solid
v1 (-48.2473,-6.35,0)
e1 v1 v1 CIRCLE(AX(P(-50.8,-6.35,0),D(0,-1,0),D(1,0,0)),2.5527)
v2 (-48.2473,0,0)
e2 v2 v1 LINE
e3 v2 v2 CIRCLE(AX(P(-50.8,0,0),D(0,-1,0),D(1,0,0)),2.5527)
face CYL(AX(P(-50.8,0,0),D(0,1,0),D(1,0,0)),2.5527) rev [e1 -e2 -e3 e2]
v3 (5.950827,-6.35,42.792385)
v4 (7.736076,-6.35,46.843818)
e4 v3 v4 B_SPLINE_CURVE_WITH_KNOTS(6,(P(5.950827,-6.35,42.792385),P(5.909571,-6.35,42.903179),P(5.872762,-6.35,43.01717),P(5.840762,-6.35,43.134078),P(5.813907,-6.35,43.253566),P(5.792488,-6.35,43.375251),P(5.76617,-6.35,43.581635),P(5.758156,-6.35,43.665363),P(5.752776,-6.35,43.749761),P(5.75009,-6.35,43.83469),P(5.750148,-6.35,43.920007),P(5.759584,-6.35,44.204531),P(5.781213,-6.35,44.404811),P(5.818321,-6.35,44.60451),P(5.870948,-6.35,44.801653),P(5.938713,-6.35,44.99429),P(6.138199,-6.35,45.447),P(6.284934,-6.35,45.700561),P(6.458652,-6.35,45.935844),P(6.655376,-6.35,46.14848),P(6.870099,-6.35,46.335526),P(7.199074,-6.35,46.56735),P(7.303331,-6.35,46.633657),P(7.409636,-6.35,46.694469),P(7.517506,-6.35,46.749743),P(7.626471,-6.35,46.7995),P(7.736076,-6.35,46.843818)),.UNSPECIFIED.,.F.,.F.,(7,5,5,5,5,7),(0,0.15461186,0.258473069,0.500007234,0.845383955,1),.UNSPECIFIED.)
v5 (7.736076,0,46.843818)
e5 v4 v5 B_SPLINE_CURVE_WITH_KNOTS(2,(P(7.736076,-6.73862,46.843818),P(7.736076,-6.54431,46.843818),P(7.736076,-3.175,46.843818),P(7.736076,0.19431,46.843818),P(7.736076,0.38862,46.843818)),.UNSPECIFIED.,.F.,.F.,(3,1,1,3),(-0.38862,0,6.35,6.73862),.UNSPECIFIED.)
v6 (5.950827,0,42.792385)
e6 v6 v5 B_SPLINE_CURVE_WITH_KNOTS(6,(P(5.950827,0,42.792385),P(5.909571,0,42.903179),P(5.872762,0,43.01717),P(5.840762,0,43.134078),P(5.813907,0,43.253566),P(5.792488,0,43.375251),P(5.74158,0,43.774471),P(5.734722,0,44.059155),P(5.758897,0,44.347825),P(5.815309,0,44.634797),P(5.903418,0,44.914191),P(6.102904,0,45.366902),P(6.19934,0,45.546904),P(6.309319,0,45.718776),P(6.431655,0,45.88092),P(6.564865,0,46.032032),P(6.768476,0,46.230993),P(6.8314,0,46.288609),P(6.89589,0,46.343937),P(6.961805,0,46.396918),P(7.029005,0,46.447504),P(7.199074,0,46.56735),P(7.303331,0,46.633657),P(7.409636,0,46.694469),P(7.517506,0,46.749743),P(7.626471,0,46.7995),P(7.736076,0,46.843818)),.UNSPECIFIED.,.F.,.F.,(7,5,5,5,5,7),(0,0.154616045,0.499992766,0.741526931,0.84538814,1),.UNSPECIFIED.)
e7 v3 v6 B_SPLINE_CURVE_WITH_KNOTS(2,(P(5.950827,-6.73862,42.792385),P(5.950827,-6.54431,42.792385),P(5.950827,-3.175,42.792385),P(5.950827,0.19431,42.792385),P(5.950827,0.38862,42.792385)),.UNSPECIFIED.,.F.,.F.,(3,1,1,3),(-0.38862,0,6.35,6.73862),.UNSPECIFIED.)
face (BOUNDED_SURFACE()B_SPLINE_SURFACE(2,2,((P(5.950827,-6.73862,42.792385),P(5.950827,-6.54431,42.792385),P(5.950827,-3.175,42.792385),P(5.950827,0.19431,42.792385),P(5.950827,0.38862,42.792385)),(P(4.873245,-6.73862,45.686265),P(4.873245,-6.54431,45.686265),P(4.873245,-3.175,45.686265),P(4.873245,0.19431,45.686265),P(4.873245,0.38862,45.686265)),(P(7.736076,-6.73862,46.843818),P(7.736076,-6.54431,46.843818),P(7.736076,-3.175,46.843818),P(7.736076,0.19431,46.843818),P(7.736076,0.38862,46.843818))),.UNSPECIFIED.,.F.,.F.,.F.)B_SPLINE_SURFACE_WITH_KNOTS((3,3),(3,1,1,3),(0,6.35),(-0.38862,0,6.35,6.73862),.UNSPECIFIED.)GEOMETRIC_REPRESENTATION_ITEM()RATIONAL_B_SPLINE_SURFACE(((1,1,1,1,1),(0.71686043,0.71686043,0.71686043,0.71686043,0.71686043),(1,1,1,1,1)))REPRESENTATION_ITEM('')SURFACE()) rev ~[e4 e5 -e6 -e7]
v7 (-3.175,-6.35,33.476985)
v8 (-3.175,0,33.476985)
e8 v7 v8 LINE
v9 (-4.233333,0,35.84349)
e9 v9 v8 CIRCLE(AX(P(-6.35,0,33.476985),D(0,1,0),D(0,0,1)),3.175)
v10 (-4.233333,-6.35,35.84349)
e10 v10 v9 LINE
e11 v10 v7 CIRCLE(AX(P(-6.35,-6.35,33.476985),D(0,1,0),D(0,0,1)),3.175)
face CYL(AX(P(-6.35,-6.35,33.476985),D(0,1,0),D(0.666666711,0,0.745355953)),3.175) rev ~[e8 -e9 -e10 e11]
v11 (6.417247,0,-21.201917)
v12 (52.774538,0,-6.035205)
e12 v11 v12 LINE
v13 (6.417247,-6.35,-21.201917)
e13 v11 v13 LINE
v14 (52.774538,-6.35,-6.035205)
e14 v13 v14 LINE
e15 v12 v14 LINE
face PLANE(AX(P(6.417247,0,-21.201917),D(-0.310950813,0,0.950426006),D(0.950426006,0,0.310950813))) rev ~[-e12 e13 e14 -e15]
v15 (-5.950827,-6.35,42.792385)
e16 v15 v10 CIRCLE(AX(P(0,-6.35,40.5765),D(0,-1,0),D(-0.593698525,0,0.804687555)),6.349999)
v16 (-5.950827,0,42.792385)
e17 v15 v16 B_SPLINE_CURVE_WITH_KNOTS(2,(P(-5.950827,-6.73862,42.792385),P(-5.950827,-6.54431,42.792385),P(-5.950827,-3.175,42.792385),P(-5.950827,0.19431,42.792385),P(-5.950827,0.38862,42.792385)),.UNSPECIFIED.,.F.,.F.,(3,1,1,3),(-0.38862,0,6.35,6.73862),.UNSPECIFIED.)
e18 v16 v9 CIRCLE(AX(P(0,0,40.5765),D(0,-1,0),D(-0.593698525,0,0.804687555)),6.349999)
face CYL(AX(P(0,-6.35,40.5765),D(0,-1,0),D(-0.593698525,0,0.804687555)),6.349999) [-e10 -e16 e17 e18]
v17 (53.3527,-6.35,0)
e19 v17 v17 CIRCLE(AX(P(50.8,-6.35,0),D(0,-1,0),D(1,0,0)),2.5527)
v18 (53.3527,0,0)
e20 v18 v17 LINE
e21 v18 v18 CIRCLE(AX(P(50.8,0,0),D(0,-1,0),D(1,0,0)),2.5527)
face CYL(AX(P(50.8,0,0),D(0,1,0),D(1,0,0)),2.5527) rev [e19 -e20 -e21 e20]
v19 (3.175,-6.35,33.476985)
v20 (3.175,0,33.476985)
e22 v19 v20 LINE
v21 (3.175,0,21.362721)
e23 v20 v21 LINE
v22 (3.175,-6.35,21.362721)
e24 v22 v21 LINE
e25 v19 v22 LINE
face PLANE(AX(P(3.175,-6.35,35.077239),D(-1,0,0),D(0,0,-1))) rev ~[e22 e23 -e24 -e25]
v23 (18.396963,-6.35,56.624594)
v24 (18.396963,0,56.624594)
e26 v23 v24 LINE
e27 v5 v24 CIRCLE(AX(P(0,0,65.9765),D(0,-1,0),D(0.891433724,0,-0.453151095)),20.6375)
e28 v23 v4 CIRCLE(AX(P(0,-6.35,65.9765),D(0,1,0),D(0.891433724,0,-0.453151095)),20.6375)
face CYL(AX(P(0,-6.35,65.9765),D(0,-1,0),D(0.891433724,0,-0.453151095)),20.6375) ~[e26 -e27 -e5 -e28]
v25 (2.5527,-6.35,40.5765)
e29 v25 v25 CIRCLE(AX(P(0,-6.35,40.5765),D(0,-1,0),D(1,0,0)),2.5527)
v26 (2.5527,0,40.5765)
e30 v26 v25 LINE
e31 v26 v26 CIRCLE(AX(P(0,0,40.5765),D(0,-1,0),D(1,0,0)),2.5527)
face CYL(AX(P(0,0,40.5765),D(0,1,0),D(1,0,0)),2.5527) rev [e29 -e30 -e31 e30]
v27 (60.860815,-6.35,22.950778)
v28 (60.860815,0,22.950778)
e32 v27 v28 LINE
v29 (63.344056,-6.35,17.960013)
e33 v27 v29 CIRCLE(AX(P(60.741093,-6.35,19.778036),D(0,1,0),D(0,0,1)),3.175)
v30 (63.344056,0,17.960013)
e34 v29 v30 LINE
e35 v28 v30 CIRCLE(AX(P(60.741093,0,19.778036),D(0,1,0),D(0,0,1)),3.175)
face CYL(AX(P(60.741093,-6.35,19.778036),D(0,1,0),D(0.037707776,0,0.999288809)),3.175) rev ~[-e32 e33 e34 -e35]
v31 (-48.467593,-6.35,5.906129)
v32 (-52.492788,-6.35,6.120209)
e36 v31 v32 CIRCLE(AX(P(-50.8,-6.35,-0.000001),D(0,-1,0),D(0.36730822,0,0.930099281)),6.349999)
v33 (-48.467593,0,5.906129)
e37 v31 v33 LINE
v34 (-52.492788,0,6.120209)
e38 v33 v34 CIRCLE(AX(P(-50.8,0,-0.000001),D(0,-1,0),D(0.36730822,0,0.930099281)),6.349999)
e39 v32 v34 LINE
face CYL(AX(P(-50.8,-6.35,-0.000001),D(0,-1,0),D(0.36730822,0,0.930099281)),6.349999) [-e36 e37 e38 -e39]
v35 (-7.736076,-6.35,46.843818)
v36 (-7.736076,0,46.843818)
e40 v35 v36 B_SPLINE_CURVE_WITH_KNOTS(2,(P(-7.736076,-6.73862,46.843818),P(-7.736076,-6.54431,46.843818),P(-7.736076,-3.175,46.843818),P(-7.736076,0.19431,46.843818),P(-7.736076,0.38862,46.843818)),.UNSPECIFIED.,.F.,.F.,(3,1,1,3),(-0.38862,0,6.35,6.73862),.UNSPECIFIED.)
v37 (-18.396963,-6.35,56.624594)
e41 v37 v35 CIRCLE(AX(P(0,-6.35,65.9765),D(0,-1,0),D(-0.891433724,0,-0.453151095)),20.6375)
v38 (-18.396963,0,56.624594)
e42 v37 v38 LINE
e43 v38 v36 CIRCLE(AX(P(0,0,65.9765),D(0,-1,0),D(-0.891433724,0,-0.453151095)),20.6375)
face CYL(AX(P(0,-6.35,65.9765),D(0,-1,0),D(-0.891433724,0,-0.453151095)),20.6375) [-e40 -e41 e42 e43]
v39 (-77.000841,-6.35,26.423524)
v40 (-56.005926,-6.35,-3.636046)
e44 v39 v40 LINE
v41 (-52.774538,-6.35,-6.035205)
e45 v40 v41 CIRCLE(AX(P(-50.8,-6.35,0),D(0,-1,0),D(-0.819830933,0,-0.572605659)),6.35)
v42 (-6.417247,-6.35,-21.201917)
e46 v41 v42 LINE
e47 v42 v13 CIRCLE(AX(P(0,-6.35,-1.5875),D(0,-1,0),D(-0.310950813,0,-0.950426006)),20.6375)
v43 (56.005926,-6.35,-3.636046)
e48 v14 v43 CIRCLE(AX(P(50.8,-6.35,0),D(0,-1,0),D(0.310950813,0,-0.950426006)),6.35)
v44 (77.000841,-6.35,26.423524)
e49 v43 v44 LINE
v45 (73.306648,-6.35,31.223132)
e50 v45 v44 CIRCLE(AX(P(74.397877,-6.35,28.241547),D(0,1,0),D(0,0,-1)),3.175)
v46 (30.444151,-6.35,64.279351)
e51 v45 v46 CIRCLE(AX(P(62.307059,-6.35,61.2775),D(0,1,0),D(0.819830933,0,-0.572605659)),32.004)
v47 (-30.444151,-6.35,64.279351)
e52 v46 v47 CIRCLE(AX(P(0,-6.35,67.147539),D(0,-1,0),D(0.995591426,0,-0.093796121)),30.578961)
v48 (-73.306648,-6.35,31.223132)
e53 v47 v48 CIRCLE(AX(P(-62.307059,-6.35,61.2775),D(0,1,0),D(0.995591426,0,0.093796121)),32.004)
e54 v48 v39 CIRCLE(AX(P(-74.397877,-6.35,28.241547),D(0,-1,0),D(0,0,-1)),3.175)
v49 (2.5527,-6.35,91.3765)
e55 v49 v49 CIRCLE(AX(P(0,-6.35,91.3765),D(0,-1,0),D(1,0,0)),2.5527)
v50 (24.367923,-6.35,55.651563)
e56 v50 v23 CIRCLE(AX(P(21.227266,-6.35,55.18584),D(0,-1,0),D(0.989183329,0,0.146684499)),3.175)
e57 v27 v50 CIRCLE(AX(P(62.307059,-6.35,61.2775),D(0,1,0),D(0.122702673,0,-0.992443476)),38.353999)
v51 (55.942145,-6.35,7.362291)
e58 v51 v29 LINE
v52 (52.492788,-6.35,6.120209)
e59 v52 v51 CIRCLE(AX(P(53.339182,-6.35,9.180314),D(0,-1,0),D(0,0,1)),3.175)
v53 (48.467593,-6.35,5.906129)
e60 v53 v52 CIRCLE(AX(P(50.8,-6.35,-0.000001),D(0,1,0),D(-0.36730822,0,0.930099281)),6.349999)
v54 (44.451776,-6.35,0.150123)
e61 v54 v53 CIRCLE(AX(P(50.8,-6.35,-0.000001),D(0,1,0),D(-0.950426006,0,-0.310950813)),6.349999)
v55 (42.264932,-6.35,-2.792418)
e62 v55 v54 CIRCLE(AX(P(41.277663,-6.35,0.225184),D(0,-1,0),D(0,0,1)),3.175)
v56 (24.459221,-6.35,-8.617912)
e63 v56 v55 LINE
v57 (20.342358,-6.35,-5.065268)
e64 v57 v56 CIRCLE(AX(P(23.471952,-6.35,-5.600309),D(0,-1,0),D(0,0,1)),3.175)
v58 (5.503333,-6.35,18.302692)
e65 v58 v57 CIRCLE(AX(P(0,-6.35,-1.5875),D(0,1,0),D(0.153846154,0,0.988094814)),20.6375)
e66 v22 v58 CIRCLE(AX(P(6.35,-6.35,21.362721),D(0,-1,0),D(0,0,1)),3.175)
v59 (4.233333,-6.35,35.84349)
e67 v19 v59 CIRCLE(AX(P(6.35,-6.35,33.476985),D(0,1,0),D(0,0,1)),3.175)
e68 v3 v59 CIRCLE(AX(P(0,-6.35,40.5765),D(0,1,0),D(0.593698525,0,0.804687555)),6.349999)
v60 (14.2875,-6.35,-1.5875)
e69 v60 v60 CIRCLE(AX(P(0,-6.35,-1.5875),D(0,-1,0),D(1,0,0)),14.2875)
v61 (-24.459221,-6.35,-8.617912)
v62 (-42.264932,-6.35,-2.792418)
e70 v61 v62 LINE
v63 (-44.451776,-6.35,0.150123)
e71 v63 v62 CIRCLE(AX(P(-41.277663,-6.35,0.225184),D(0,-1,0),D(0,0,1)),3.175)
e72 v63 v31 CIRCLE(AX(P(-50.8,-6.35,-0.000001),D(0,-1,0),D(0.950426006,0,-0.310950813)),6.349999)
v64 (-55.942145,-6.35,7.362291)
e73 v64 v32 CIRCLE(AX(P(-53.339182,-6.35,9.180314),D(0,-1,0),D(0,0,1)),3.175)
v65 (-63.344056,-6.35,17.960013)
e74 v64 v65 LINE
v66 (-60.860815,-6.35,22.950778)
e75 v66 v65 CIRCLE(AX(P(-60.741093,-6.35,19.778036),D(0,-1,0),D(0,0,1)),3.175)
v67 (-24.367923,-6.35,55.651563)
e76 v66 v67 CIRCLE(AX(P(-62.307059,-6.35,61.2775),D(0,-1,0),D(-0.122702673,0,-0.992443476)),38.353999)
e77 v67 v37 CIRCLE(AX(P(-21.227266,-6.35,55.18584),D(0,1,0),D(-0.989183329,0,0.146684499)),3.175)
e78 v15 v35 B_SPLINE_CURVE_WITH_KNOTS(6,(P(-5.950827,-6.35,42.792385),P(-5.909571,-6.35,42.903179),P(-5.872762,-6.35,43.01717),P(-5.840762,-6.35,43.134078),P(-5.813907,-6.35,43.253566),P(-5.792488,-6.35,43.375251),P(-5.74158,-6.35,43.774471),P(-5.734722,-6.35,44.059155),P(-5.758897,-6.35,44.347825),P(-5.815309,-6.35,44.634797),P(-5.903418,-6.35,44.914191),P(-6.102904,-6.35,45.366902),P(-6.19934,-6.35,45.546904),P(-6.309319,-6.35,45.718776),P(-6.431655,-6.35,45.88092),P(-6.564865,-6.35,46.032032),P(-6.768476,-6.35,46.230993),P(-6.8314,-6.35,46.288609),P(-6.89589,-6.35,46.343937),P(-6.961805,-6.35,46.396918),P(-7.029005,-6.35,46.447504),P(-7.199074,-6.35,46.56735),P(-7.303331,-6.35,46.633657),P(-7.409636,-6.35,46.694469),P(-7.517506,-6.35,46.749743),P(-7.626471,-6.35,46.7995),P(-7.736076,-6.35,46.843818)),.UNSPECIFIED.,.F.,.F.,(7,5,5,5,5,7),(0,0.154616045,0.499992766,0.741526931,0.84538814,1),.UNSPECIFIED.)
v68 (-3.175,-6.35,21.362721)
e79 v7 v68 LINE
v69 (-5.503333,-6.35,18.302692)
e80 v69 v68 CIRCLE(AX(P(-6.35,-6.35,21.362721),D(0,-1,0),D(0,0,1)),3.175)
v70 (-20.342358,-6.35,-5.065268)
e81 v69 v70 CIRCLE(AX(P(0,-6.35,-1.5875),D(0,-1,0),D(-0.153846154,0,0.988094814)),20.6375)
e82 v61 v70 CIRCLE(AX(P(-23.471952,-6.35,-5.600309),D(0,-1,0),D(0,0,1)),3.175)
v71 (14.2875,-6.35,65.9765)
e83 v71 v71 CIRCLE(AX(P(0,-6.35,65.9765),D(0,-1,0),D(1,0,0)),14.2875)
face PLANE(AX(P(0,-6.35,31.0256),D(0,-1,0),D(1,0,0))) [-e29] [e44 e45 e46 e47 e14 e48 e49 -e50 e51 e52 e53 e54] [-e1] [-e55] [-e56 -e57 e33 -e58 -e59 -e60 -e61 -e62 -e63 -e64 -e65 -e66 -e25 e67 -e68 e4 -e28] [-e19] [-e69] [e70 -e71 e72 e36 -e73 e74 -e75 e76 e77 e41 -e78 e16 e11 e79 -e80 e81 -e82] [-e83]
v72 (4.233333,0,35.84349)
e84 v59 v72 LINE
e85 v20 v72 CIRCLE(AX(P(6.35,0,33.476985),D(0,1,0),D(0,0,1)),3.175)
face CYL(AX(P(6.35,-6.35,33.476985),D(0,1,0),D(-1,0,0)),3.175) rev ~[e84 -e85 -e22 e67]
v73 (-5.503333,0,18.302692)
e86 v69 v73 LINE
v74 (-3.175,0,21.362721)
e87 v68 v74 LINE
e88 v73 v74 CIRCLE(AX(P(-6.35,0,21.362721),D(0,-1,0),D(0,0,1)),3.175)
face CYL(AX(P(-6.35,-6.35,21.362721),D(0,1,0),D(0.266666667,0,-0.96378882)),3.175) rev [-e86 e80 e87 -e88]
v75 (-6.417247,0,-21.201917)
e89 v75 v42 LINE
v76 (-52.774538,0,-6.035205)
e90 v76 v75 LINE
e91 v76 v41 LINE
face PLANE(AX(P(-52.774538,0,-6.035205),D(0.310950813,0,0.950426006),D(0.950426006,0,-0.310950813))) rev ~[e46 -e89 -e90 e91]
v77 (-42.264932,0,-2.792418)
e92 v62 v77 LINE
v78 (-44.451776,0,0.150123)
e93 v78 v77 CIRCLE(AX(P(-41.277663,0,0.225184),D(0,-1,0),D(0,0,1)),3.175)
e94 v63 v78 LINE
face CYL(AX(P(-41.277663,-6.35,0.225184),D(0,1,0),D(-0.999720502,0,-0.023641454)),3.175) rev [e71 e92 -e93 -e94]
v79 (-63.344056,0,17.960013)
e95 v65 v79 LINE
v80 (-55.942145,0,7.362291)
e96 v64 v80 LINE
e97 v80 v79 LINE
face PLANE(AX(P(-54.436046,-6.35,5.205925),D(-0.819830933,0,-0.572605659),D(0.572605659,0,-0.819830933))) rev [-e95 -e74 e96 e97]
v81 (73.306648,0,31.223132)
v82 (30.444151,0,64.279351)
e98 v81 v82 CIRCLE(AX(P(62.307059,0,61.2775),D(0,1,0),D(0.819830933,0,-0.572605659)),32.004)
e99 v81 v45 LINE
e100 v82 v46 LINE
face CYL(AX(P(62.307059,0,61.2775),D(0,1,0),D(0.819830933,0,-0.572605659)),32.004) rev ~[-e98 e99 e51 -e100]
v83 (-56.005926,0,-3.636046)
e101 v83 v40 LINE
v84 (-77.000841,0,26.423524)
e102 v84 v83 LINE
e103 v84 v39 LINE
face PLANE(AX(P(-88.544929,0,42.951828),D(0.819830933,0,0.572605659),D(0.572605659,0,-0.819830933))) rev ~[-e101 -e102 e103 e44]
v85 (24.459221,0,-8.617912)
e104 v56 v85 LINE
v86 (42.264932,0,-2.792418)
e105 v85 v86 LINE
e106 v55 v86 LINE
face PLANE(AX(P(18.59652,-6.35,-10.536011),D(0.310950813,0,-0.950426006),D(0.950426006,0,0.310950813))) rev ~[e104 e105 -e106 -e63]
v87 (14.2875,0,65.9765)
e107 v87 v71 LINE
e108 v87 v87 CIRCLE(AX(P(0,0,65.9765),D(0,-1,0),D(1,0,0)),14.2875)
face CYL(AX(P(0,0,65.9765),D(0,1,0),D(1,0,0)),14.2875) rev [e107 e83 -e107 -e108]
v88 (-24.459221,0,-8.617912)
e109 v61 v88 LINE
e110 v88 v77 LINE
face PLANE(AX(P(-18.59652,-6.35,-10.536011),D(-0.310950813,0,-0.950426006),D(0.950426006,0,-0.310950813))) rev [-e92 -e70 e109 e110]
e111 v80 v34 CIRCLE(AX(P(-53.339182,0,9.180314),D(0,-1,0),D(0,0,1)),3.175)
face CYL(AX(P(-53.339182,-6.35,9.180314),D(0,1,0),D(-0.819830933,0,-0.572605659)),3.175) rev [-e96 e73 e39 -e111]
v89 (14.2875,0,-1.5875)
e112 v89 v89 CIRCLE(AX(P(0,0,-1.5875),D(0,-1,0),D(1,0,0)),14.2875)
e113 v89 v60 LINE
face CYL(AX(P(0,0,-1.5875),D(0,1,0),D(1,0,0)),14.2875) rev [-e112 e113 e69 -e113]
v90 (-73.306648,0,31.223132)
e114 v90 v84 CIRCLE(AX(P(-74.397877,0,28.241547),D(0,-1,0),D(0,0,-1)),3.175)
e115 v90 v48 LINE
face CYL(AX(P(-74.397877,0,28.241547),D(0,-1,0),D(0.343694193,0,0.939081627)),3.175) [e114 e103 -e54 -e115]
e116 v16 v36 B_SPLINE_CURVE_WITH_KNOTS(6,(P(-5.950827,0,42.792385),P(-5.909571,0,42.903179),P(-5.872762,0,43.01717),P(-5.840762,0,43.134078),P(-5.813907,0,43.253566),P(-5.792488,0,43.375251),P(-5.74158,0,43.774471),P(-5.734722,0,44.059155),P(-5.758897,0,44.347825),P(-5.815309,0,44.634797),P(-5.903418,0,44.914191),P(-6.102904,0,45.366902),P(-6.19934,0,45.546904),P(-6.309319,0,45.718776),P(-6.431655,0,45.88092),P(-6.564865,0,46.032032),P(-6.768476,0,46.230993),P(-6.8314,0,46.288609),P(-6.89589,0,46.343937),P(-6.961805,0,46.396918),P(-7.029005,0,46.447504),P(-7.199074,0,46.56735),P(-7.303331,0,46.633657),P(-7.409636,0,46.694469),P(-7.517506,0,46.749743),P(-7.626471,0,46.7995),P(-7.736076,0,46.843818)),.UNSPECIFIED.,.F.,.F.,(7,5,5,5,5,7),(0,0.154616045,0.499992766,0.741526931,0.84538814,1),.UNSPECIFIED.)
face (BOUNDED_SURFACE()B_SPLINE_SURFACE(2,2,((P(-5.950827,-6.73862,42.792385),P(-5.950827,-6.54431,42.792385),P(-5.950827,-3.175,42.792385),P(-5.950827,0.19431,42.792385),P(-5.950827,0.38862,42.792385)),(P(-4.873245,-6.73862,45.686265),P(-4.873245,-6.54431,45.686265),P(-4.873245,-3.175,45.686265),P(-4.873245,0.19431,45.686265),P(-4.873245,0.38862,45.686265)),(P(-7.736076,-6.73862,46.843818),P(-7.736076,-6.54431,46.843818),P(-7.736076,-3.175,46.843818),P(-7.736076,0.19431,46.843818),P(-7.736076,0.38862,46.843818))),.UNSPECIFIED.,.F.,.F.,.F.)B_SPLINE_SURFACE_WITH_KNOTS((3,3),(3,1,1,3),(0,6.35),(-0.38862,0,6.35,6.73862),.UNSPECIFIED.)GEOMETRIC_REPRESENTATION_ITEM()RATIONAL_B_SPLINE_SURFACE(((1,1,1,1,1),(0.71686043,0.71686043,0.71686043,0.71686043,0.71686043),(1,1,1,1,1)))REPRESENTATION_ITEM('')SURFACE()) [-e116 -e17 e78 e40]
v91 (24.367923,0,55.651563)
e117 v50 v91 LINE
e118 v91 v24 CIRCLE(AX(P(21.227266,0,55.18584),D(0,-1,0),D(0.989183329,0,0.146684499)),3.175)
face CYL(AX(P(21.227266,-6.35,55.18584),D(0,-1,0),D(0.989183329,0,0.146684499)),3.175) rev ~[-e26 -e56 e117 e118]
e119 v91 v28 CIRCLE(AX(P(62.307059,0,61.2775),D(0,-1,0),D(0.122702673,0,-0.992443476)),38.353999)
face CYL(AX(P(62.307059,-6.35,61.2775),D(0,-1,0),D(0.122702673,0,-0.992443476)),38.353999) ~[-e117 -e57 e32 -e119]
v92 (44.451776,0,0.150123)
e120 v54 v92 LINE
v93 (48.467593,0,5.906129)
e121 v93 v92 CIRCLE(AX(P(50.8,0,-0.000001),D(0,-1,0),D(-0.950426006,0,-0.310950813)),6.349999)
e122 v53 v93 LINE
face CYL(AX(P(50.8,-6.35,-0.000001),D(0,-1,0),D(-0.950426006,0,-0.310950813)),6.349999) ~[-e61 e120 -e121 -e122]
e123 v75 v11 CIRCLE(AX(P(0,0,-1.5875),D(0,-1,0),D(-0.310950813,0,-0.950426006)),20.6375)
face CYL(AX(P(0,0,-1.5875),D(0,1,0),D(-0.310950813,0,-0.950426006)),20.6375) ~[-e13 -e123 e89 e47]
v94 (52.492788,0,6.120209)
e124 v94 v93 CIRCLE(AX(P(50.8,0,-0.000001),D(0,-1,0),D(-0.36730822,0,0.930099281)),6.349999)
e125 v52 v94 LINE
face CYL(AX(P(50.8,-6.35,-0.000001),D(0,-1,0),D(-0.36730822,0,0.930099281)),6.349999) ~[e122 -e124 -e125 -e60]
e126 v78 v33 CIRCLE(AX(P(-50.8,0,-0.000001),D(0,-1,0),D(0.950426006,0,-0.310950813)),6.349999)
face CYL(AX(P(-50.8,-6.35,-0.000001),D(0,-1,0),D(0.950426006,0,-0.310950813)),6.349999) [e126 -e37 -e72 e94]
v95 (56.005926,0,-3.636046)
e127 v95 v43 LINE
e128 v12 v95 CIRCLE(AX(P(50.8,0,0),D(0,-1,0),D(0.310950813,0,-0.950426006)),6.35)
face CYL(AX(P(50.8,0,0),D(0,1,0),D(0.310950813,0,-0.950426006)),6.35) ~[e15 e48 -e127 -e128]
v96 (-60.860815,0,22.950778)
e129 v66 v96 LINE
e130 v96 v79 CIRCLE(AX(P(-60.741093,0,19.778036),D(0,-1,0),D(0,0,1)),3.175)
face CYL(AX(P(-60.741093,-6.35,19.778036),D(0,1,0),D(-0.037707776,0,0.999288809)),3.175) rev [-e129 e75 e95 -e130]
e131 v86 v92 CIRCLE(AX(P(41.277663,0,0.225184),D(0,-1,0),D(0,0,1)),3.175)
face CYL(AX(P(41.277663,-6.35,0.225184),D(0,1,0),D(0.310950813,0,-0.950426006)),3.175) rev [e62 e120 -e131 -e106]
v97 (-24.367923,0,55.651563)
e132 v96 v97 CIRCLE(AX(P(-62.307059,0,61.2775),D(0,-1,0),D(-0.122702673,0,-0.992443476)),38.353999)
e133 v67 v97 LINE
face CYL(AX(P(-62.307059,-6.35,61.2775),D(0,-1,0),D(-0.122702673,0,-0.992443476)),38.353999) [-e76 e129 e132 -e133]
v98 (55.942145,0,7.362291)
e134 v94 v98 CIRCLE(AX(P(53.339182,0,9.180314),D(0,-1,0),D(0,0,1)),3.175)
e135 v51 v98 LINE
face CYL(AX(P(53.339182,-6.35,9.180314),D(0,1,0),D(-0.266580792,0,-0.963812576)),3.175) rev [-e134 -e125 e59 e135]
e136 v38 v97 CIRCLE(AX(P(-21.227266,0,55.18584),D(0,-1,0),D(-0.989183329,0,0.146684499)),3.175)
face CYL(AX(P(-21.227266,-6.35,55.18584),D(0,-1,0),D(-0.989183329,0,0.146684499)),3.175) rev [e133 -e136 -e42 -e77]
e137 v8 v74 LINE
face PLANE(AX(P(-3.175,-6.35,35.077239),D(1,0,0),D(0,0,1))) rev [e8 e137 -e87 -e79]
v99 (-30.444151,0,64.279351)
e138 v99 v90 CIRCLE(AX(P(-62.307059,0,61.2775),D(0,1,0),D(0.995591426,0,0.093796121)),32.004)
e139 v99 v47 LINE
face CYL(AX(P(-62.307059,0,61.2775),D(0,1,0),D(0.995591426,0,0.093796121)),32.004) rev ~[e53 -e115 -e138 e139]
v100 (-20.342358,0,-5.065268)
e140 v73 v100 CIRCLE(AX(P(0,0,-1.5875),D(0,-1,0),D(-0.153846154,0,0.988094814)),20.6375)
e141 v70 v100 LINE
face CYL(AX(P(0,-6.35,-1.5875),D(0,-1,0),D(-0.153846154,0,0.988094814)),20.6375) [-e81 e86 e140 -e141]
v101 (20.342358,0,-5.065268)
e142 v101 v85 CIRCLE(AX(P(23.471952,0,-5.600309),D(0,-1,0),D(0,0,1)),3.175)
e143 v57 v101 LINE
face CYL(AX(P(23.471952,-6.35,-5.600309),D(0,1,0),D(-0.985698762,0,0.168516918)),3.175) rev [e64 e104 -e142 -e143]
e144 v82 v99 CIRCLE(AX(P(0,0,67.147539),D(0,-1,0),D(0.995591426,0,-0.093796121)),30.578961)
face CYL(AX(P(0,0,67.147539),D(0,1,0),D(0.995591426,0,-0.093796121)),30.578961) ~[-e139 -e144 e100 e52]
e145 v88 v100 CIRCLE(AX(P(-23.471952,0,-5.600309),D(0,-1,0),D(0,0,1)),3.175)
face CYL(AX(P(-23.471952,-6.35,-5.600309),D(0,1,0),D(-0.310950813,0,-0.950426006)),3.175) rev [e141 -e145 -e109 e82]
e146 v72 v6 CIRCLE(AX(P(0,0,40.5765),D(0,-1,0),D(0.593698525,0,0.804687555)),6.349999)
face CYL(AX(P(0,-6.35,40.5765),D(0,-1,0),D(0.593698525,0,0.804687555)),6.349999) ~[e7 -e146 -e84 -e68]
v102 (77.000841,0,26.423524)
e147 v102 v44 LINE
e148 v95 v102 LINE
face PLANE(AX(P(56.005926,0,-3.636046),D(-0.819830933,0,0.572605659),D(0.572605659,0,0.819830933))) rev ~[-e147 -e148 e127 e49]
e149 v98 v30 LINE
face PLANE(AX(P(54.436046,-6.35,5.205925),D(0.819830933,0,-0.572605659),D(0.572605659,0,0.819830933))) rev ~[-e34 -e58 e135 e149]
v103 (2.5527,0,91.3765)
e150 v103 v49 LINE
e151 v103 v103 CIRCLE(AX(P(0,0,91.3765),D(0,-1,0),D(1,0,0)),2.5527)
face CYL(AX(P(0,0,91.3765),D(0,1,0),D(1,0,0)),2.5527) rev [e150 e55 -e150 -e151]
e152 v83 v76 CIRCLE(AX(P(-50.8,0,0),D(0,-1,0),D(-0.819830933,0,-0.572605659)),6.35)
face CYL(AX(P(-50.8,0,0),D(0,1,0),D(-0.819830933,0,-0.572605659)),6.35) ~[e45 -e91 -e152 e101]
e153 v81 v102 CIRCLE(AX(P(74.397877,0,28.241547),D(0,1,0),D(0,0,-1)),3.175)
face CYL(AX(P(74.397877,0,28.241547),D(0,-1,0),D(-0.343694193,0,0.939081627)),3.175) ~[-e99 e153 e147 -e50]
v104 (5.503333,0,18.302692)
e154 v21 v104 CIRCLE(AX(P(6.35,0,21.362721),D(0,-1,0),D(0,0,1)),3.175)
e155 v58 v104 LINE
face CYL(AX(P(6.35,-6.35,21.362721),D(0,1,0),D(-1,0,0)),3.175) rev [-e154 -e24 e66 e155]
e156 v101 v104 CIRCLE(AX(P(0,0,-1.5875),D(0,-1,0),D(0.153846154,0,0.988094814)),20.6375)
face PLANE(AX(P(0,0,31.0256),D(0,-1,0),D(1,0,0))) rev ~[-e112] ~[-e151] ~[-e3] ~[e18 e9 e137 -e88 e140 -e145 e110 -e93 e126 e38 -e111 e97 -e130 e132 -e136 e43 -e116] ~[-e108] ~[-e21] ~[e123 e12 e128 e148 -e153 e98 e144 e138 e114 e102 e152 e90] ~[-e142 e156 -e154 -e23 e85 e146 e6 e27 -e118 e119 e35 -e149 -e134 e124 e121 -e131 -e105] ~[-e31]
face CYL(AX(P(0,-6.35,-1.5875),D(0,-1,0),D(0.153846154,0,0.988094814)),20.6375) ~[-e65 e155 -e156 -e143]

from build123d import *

# Parameters (mm, degrees)
F0_R     = 2.5527
F0_R_2   = 14.2875
F1_DEPTH = 6.35
F2_F1_R  = 3.175
F2_F2_R  = 3.175
F4_DEPTH = 25.4
F5_R     = 3.175


# Not quite as in the source:
# - a pattern or mirror of a feature is missing from the dataset's text; its kind, count and spacing are read off the source's solid


with BuildPart() as f1:
    # F0 (on Front) → F1 (new body)
    with BuildSketch(Plane.XZ):
        with BuildLine():
            ThreePointArc((-30.44415143, 64.2793510436), (-51.27863842, 31.2336995415), (-88.5449286211, 42.9518284873))
            Line((-88.5449286211, 42.9518284873), (-56.0059264265, -3.6360459351))
            ThreePointArc((-56.0059264265, -3.6360459351), (-54.5853345088, -5.0984058937), (-52.7745376605, -6.0352051355))
            Line((-52.7745376605, -6.0352051355), (-6.4172473966, -21.2019166903))
            ThreePointArc((-6.4172473966, -21.2019166903), (0, -22.225), (6.4172473966, -21.2019166903))
            Line((6.4172473966, -21.2019166903), (52.7745376605, -6.0352051355))
            ThreePointArc((52.7745376605, -6.0352051355), (54.5853345088, -5.0984058937), (56.0059264265, -3.6360459351))
            Line((56.0059264265, -3.6360459351), (88.5449286211, 42.9518284873))
            ThreePointArc((88.5449286211, 42.9518284873), (51.27863842, 31.2336995415), (30.44415143, 64.2793510436))
            ThreePointArc((30.44415143, 64.2793510436), (0, 97.7265), (-30.44415143, 64.2793510436))
        make_face()
        with Locations((-50.8, 0)):
            Circle(F0_R, mode=Mode.SUBTRACT)
        with Locations((0, -1.5875)):
            Circle(F0_R_2, mode=Mode.SUBTRACT)
        with Locations((50.8, 0)):
            Circle(F0_R, mode=Mode.SUBTRACT)
        with Locations((0, 40.5765)):
            Circle(F0_R, mode=Mode.SUBTRACT)
        with Locations((0, 65.9765)):
            Circle(F0_R_2, mode=Mode.SUBTRACT)
        with Locations((0, 91.3765)):
            Circle(F0_R, mode=Mode.SUBTRACT)
    extrude(amount=F1_DEPTH)

    # F2: fillet of radius 3.175 on 2 edges, made by hand

    # F2_f1
    f2_f1_edges = [f1.edges().sort_by_distance(p)[0] for p in [
        (-88.5449286211, -3.175, 42.9518284873),
    ]]
    fillet(f2_f1_edges, radius=F2_F1_R)

    # F2_f2
    f2_f2_edges = [f1.edges().sort_by_distance(p)[0] for p in [
        (88.5449286211, -3.175, 42.9518284873),
    ]]
    fillet(f2_f2_edges, radius=F2_F2_R)

    # F3 (on face) → F4 (cut)
    with BuildSketch(Plane.XZ.offset(6.35)):
        with BuildLine():
            Line((3.175, 35.0772394145), (3.175, 18.8043067186))
            ThreePointArc((3.175, 18.8043067186), (18.2678223179, 8.0142224503), (18.5965200171, -10.5360110216))
            Line((18.5965200171, -10.5360110216), (44.7647958403, -1.9745379709))
            ThreePointArc((44.7647958403, -1.9745379709), (45.0527871506, 2.7003757871), (48.4675934129, 5.9061293383))
            ThreePointArc((48.4675934129, 5.9061293383), (51.5398921213, 6.306746055), (54.4360459499, 5.2059254026))
            Line((54.4360459499, 5.2059254026), (67.0131976966, 23.2133234987))
            ThreePointArc((67.0131976966, 23.2133234987), (39.0870703991, 30.7510953733), (24.3679226321, 55.6515628324))
            ThreePointArc((24.3679226321, 55.6515628324), (21.7379294481, 58.3195031239), (18.3969634882, 56.6245942764))
            ThreePointArc((18.3969634882, 56.6245942764), (12.3594159846, 49.4492121774), (3.7699852595, 45.6862654673))
            ThreePointArc((3.7699852595, 45.6862654673), (6.3400365543, 40.2209321773), (3.175, 35.0772394145))
        make_face()
    f4 = extrude(amount=-F4_DEPTH, mode=Mode.SUBTRACT)

    # F4_copies: F4 across plane
    add(f4.mirror(Plane(origin=(0, 0, 0), x_dir=(0, 0, -1), z_dir=(-1, 0, 0))), mode=Mode.SUBTRACT)

    # F5
    f5_edges = [f1.edges().sort_by_distance(p)[0] for p in [
        (3.769985, -3.175, 45.686265),
        (3.175, -3.175, 35.077239),
        (3.175, -3.175, 18.804307),
        (18.59652, -3.175, -10.536011),
        (44.764796, -3.175, -1.974538),
        (54.436046, -3.175, 5.205925),
        (67.013198, -3.175, 23.213323),
        (-3.769985, -3.175, 45.686265),
        (-67.013198, -3.175, 23.213323),
        (-54.436046, -3.175, 5.205925),
        (-44.764796, -3.175, -1.974538),
        (-18.59652, -3.175, -10.536011),
        (-3.175, -3.175, 18.804307),
        (-3.175, -3.175, 35.077239),
    ]]
    fillet(f5_edges, radius=F5_R)


solid = f1.part
